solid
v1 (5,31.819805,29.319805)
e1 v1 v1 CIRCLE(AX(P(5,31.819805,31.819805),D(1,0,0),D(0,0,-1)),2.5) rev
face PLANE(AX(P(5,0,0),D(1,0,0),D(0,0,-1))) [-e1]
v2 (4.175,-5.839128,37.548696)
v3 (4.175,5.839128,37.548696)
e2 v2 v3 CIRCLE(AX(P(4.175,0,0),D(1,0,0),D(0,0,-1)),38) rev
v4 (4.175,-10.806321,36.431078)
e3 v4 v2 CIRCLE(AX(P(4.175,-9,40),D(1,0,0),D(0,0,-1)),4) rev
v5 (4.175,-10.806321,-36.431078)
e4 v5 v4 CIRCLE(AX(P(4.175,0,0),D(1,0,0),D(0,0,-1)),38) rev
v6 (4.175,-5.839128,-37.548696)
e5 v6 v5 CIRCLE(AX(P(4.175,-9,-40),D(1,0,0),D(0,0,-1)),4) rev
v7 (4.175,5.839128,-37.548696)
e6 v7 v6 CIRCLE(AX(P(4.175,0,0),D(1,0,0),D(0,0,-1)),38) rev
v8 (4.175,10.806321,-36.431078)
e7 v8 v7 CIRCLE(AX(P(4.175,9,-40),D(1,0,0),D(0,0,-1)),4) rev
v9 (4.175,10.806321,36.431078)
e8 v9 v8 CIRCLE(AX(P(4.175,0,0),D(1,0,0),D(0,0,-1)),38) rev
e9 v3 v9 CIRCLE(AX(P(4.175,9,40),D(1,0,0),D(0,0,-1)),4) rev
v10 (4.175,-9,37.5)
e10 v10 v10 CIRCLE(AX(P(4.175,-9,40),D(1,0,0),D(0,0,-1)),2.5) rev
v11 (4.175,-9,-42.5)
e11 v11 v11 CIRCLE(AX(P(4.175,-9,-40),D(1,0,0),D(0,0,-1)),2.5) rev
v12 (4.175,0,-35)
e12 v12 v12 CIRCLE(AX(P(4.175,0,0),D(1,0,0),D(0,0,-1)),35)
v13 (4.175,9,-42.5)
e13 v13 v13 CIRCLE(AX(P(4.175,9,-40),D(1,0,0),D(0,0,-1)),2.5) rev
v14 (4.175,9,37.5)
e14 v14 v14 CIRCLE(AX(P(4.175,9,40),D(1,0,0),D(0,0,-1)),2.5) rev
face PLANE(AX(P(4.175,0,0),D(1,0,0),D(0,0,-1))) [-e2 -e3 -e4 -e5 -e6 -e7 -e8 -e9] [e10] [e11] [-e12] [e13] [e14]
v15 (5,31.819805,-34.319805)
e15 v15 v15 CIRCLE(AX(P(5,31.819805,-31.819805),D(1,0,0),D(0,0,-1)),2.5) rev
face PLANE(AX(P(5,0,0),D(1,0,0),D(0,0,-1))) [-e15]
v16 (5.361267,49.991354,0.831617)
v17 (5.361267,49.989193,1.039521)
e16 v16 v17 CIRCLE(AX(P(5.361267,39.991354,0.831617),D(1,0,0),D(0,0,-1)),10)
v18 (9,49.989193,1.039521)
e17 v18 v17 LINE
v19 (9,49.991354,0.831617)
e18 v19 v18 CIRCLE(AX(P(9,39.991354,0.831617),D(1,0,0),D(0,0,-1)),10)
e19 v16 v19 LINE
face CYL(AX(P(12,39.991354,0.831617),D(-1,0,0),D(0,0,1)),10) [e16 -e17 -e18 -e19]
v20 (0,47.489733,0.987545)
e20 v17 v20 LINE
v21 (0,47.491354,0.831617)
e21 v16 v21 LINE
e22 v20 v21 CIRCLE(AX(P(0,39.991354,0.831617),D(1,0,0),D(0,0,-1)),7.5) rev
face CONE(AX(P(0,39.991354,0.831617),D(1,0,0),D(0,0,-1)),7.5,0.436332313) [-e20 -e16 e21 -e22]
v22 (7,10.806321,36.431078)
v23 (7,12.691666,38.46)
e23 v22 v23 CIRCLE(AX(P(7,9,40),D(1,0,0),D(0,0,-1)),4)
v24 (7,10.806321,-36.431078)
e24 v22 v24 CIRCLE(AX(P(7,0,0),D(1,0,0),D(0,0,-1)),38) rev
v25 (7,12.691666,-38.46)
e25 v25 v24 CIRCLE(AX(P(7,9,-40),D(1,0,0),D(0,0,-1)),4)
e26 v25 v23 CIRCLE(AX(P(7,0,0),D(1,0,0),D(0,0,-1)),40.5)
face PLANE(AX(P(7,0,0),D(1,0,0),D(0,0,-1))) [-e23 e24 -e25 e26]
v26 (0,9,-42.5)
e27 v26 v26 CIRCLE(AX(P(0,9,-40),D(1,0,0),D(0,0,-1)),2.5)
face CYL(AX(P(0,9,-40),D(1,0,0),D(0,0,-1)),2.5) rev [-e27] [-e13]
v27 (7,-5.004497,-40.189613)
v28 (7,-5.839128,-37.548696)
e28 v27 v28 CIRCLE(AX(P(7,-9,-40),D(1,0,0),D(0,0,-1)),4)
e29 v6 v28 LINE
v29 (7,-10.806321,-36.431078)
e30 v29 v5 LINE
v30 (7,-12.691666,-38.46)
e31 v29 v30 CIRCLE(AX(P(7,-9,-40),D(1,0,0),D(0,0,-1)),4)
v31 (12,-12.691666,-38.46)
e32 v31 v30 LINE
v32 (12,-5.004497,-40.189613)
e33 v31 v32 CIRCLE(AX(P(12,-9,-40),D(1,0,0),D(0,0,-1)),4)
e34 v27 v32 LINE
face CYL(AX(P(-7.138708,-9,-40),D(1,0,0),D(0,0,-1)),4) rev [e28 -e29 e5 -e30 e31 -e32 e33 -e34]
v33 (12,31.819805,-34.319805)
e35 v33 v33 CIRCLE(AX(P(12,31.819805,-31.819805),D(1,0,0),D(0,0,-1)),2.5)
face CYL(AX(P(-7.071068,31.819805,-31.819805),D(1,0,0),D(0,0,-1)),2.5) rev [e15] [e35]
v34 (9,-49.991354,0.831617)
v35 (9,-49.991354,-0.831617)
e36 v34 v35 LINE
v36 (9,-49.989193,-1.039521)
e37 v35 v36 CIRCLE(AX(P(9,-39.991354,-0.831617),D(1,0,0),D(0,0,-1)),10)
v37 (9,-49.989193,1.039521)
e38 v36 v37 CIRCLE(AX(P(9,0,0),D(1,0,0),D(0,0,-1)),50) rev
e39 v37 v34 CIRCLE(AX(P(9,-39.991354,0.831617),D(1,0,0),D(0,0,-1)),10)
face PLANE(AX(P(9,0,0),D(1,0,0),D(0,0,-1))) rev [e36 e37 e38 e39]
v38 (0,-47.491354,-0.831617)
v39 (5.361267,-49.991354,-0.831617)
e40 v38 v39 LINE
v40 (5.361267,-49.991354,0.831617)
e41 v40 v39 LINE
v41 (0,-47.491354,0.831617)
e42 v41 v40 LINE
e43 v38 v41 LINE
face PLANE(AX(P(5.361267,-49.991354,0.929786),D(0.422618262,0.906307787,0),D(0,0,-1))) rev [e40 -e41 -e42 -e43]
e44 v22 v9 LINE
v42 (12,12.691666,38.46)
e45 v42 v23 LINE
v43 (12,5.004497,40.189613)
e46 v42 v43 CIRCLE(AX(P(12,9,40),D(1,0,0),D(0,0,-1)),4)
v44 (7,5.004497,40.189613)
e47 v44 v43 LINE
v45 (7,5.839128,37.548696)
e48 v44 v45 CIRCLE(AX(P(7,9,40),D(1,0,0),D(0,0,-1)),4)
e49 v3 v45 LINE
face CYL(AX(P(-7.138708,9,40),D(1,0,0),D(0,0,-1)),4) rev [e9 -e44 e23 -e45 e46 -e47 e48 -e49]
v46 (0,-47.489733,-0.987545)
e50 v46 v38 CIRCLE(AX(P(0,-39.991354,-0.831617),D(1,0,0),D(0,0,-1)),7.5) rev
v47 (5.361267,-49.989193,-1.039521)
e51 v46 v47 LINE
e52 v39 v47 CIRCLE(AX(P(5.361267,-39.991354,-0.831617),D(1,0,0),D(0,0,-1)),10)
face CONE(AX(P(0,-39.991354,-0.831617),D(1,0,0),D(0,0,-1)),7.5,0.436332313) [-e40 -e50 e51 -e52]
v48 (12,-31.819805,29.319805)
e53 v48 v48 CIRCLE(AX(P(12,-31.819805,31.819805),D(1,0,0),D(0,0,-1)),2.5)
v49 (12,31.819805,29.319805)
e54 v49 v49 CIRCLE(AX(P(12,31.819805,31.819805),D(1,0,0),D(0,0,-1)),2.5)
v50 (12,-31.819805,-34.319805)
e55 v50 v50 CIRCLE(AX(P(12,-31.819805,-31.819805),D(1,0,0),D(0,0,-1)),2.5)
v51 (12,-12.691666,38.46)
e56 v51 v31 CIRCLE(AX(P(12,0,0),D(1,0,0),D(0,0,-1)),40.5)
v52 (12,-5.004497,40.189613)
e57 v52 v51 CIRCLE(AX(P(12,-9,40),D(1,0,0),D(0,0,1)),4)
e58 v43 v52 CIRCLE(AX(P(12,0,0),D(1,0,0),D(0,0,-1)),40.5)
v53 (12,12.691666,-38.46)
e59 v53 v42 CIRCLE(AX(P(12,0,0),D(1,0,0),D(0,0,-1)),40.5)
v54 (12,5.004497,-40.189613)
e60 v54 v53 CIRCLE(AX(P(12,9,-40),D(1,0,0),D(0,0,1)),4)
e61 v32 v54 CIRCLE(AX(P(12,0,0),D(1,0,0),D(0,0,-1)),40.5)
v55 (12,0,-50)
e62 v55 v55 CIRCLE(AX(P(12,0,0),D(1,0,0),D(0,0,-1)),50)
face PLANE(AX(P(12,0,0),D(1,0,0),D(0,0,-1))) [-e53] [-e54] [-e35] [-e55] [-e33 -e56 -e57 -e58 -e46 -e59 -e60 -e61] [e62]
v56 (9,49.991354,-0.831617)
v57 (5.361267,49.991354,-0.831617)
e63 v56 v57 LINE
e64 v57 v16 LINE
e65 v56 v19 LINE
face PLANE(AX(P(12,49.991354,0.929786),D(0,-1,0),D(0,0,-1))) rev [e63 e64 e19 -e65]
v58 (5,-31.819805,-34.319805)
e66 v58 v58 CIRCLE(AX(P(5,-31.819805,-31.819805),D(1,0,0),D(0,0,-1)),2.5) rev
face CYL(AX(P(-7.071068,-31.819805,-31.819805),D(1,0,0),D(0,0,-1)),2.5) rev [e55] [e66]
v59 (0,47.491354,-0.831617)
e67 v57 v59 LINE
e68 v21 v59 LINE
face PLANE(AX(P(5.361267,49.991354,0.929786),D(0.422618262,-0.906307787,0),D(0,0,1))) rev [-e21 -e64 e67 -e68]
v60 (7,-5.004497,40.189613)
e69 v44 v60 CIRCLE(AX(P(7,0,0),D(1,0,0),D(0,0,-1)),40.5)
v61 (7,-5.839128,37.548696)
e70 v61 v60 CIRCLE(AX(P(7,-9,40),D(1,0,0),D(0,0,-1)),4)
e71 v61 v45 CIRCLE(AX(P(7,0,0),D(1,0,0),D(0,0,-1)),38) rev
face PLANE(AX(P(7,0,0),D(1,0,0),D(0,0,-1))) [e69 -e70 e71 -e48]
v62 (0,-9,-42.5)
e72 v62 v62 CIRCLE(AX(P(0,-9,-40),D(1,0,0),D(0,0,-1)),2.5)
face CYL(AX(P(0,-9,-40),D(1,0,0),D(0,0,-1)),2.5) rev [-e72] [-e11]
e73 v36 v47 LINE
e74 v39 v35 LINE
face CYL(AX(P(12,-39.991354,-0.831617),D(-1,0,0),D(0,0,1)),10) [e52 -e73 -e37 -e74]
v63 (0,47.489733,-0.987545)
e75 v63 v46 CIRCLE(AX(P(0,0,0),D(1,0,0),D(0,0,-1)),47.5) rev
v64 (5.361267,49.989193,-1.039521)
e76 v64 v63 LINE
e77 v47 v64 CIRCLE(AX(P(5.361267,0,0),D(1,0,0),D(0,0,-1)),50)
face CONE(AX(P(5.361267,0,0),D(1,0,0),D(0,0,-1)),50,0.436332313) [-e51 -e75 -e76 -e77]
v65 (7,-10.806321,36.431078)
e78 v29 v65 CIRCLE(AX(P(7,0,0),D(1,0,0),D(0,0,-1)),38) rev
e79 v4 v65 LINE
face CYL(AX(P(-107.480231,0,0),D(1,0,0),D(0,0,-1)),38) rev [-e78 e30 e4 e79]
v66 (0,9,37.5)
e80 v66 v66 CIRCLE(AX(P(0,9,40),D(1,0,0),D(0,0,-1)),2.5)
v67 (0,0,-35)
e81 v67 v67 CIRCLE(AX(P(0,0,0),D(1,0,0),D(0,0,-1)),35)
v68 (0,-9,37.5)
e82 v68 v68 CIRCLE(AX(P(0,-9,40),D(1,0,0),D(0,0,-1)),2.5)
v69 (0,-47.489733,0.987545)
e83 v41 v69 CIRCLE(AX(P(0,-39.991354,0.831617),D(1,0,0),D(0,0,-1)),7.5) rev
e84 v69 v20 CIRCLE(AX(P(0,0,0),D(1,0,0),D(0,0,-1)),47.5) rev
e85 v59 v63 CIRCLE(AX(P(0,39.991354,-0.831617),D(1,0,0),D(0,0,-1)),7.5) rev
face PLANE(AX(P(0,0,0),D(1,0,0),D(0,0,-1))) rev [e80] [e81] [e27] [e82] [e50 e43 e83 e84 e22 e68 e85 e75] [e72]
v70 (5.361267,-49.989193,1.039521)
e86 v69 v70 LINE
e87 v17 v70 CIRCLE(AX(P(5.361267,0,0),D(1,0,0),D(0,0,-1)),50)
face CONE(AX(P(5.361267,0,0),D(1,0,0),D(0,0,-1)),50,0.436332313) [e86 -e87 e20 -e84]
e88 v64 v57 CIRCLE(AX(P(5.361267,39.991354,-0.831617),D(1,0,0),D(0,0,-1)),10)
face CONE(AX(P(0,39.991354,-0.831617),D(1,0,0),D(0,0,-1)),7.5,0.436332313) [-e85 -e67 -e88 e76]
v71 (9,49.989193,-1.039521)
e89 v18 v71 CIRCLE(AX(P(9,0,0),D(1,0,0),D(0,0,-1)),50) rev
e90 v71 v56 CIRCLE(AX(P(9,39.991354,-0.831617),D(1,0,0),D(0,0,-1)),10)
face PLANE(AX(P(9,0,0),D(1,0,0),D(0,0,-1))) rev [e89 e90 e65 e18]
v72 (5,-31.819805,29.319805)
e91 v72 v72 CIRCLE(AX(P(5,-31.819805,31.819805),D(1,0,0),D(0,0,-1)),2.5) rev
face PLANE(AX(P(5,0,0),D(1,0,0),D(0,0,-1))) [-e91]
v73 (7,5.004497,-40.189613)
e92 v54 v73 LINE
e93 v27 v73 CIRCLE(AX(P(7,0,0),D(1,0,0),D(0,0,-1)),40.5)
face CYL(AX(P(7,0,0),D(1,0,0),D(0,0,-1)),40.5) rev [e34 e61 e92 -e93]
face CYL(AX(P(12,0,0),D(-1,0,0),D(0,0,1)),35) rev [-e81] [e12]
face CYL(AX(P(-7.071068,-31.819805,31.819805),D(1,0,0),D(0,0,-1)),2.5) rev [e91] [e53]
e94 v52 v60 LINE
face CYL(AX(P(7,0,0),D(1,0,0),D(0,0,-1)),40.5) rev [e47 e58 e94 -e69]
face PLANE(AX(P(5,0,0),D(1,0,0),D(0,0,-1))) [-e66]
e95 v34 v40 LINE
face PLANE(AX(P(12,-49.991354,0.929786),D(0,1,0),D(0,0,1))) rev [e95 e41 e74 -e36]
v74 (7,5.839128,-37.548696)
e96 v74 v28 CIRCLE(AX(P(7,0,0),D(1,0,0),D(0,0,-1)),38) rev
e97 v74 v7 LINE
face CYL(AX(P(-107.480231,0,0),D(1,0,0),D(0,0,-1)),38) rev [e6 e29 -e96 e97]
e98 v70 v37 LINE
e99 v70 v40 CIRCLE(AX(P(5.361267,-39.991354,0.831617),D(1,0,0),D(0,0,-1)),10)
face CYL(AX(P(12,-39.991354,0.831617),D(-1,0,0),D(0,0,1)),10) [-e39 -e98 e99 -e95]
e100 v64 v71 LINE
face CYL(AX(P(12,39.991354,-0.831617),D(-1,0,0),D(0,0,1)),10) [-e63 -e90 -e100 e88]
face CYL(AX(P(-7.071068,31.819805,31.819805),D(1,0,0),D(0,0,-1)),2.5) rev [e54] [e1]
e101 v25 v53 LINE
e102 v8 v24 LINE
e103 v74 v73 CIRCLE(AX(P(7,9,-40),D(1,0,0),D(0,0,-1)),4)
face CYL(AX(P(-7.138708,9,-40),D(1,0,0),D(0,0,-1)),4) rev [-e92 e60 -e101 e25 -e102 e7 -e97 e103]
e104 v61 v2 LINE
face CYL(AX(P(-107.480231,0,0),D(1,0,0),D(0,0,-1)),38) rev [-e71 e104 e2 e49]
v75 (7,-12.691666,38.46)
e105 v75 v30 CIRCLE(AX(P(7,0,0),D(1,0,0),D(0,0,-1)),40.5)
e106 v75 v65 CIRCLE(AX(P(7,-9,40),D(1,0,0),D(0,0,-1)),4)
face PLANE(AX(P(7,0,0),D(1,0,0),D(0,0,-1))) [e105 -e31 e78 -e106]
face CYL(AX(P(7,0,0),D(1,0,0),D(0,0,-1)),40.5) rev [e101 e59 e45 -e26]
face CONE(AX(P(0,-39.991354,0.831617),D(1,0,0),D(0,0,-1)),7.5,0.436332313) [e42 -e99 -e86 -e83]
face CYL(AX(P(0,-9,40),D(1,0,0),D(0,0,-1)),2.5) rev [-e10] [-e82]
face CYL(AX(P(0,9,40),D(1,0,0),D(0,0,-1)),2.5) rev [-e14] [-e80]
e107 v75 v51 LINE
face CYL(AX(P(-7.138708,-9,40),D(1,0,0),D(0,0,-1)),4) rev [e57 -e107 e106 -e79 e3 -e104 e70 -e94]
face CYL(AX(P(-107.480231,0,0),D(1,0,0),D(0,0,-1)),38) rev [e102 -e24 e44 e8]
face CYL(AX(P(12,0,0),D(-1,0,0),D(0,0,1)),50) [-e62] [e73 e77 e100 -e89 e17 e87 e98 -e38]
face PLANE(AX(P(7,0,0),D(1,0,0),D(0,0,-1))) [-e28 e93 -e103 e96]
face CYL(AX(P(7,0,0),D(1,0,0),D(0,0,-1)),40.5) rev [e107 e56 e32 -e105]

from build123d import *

# Parameters (mm, degrees)
SKETCH1_R           = 35.00000000000001
BOSS_EXTRUDE1_DEPTH = 12
SKETCH2_R           = 38
CUT_EXTRUDE1_DEPTH  = 7.825
SKETCH3_R           = 40.5
CUT_EXTRUDE2_DEPTH  = 5
BOSS_EXTRUDE3_START = -3
SKETCH4_R           = 50.000000000000014
SKETCH4_R_2         = 40.5
BOSS_EXTRUDE3_DEPTH = 3
FILLET1_R           = 10
SKETCH5_R           = 2.5000000000000018
CUT_EXTRUDE3_DEPTH  = 72.72168430816446
CUT_EXTRUDE4_REACH  = 73.722
SKETCH9_R           = 3.999999999999999
CHAMFER2_SIZE       = 2.5
CHAMFER2_SIZE2      = 5.361267301273932
SKETCH10_R          = 2.499999999999999
SKETCH10_R_2        = 2.5000000000000004
SKETCH10_R_3        = 2.5000000000000018
SKETCH10_R_4        = 2.499999999999998
CUT_EXTRUDE5_DEPTH  = 7


with BuildPart() as part:
    # Sketch1 → Boss-Extrude1 (new body)
    with BuildSketch(Plane(origin=(0, 0, 0), x_dir=(0, 0, -1), z_dir=(1, 0, 0))):
        with BuildLine():
            Line((-0.9297857327654514, 49.99135423741935), (0.9297857327657116, 49.99135423741935))
            ThreePointArc((0.9297857327657116, 49.99135423741935), (50, 4.17e-15), (0.9297857327657116, -49.99135423741935))
            Line((0.9297857327657116, -49.99135423741935), (-0.9297857327654514, -49.99135423741935))
            ThreePointArc((-0.9297857327654514, -49.99135423741935), (-50.00000000000001, 1.029e-14), (-0.9297857327654514, 49.99135423741935))
        make_face()
        Circle(SKETCH1_R, mode=Mode.SUBTRACT)
    extrude(amount=BOSS_EXTRUDE1_DEPTH)

    # Sketch2 → Cut-Extrude1 (cut)
    with BuildSketch(Plane(origin=(12, 0, 0), x_dir=(0, 0, -1), z_dir=(1, 0, 0))):
        Circle(SKETCH2_R)
    extrude(amount=-CUT_EXTRUDE1_DEPTH, mode=Mode.SUBTRACT)

    # Sketch3 → Cut-Extrude2 (cut)
    with BuildSketch(Plane(origin=(12, 0, 0), x_dir=(0, 0, -1), z_dir=(1, 0, 0))):
        Circle(SKETCH3_R)
    extrude(amount=-CUT_EXTRUDE2_DEPTH, mode=Mode.SUBTRACT)

    # Sketch4 → Boss-Extrude3 (add)
    with BuildSketch(Plane(origin=(12, 0, 0), x_dir=(0, 0, -1), z_dir=(1, 0, 0)).offset(BOSS_EXTRUDE3_START)):
        with Locations(Location((0, 0, 0), (0, 0, 91.065517382))):
            Circle(SKETCH4_R)
        Circle(SKETCH4_R_2, mode=Mode.SUBTRACT)
    extrude(amount=BOSS_EXTRUDE3_DEPTH)

    # Fillet1
    # the kernel refuses this fillet: 10 mm, written as the material it takes off along each edge
    with BuildSketch(Plane(origin=(-0.2743909200605188, 49.99135423741935, 0.9297857327658466), x_dir=(0, 0, -1), z_dir=(1, 0, 0))) as fillet1_piece_1:
        with BuildLine():
            CenterArc((0.09816907994918522, -10), FILLET1_R, 90, 1.1912889407278016)
            ThreePointArc((-0.10973508325497316, -0.00216144064516044), (-0.05486813470735008, -0.0010506100030554), (0, 0))
            Line((0, 0), (0.09816907994918522, 0))
        make_face()
    extrude(amount=9.27439092006841, mode=Mode.SUBTRACT)
    with BuildSketch(Plane(origin=(-0.27439092006290455, 49.99135423741935, -0.9297857327660938), x_dir=(0, 0, 1), z_dir=(1, 0, 0))) as fillet1_piece_2:
        with BuildLine():
            CenterArc((0.09816907994990931, 10), FILLET1_R, 268.80871105927287, 1.1912889407271336)
            ThreePointArc((-0.10973508325413761, 0.00216144064516044), (-0.05486813470693486, 0.0010506100030554), (0, 0))
            Line((0, 0), (0.09816907994990931, 0))
        make_face()
    extrude(amount=9.274390920070795, mode=Mode.SUBTRACT)
    with BuildSketch(Plane(origin=(-0.27439092006166854, -49.991354237419344, -0.9297857327653347), x_dir=(0, 0.019693077349376736, -0.9998060725483275), z_dir=(1, 0, 0))) as fillet1_piece_3:
        with BuildLine():
            CenterArc((0.09878073122404785, 9.999993976768026), FILLET1_R, 268.8715968385298, 1.19128894072702)
            Line((-0.09815004226971198, 0.00193325128475002), (0, 0))
            ThreePointArc((0, 0), (0.05487818401377818, -3.011615987851e-05), (0.10975636802755673, 0))
        make_face()
    extrude(amount=9.274390920069559, mode=Mode.SUBTRACT)
    with BuildSketch(Plane(origin=(-0.27439092005998433, -49.991354237419344, 0.9297857327658335), x_dir=(0, 0.019693077349452987, 0.999806072548326), z_dir=(1, 0, 0))) as fillet1_piece_4:
        with BuildLine():
            CenterArc((0.09878073122379578, -9.999993976768023), FILLET1_R, 89.93711422074833, 1.191288940726281)
            Line((-0.09815004227073397, -0.00193325128476343), (0, 0))
            ThreePointArc((0, 0), (0.05487818401320508, 3.011615987141e-05), (0.10975636802641013, 0))
        make_face()
    extrude(amount=9.274390920067875, mode=Mode.SUBTRACT)

    # Sketch5 → Cut-Extrude3 (cut, through all)
    with BuildSketch(Plane(origin=(12, 0, 0), x_dir=(0, 0, -1), z_dir=(1, 0, 0))):
        with Locations((39.999999999999986, 9.000000000000002)):
            Circle(SKETCH5_R)
        with Locations((39.999999999999986, -8.999999999999998)):
            Circle(SKETCH5_R)
        with Locations((-40.000000000000014, -8.999999999999998)):
            Circle(SKETCH5_R)
        with Locations((-40.000000000000014, 8.999999999999998)):
            Circle(SKETCH5_R)
    extrude(amount=-CUT_EXTRUDE3_DEPTH, mode=Mode.SUBTRACT)

    # Cut-Extrude4: up to this face of the body (flat: up to its plane)
    cut_extrude4_end = Plane(part.part.faces().sort_by_distance((4.175, 0, 36.925197693))[0])
    # Sketch9 → Cut-Extrude4 (cut, up to the picked face)
    with BuildSketch(Plane(origin=(12, 0, 0), x_dir=(0, 0, -1), z_dir=(1, 0, 0)), mode=Mode.PRIVATE) as cut_extrude4_sk1:
        with Locations((-40.000000000000014, 8.999999999999998)):
            Circle(SKETCH9_R)
    cut_extrude4_tool1 = split(extrude(cut_extrude4_sk1.sketch, amount=-CUT_EXTRUDE4_REACH, mode=Mode.PRIVATE), bisect_by=cut_extrude4_end, keep=Keep.BOTH, mode=Mode.PRIVATE)
    # Sketch9 → Cut-Extrude4 (cut, up to the picked face)
    with BuildSketch(Plane(origin=(12, 0, 0), x_dir=(0, 0, -1), z_dir=(1, 0, 0)), mode=Mode.PRIVATE) as cut_extrude4_sk2:
        with Locations((-40.000000000000014, -8.999999999999998)):
            Circle(SKETCH9_R)
    cut_extrude4_tool2 = split(extrude(cut_extrude4_sk2.sketch, amount=-CUT_EXTRUDE4_REACH, mode=Mode.PRIVATE), bisect_by=cut_extrude4_end, keep=Keep.BOTH, mode=Mode.PRIVATE)
    # Sketch9 → Cut-Extrude4 (cut, up to the picked face)
    with BuildSketch(Plane(origin=(12, 0, 0), x_dir=(0, 0, -1), z_dir=(1, 0, 0)), mode=Mode.PRIVATE) as cut_extrude4_sk3:
        with Locations((39.999999999999986, -8.999999999999998)):
            Circle(SKETCH9_R)
    cut_extrude4_tool3 = split(extrude(cut_extrude4_sk3.sketch, amount=-CUT_EXTRUDE4_REACH, mode=Mode.PRIVATE), bisect_by=cut_extrude4_end, keep=Keep.BOTH, mode=Mode.PRIVATE)
    # Sketch9 → Cut-Extrude4 (cut, up to the picked face)
    with BuildSketch(Plane(origin=(12, 0, 0), x_dir=(0, 0, -1), z_dir=(1, 0, 0)), mode=Mode.PRIVATE) as cut_extrude4_sk4:
        with Locations((39.999999999999986, 8.999999999999998)):
            Circle(SKETCH9_R)
    cut_extrude4_tool4 = split(extrude(cut_extrude4_sk4.sketch, amount=-CUT_EXTRUDE4_REACH, mode=Mode.PRIVATE), bisect_by=cut_extrude4_end, keep=Keep.BOTH, mode=Mode.PRIVATE)
    add(cut_extrude4_tool1.solids().sort_by(Axis((12, 9, 40), (-1, 0, 0)))[0], mode=Mode.SUBTRACT)
    add(cut_extrude4_tool2.solids().sort_by(Axis((12, -9, 40), (-1, 0, 0)))[0], mode=Mode.SUBTRACT)
    add(cut_extrude4_tool3.solids().sort_by(Axis((12, -9, -40), (-1, 0, 0)))[0], mode=Mode.SUBTRACT)
    add(cut_extrude4_tool4.solids().sort_by(Axis((12, 9, -40), (-1, 0, 0)))[0], mode=Mode.SUBTRACT)

    # Chamfer2
    chamfer2_edges = [part.edges().sort_by_distance(p)[0] for p in [
        (0, 4.163e-14, 50.000000000000014),
        (0, 8.2534e-13, -50),
        (0, 49.99135423741935, 4.9938e-13),
        (0, -49.99135423741935, 7.583e-14),
        (0, -49.99081386265752, 0.9355743520296814),
        (0, -49.990813862657504, -0.9355743520294721),
        (0, 49.99081386265747, -0.9355743520297026),
        (0, 49.99081386265747, 0.9355743520307873),
    ]]
    chamfer2_side = [part.faces().sort_by_distance(p)[0] for p in [
        (0, -48.576798978470165, -0.920873784247004),
    ]]
    chamfer(chamfer2_edges, length=CHAMFER2_SIZE, length2=CHAMFER2_SIZE2, reference=chamfer2_side[0])

    # Sketch10 → Cut-Extrude5 (cut)
    with BuildSketch(Plane(origin=(12, 0, 0), x_dir=(0, 0, -1), z_dir=(1, 0, 0))):
        with Locations((-31.819805153394583, 31.819805153394686)):
            Circle(SKETCH10_R)
        with Locations((31.819805153394796, 31.81980515339447)):
            Circle(SKETCH10_R_2)
        with Locations((31.81980515339436, -31.819805153394906)):
            Circle(SKETCH10_R_3)
        with Locations((-31.81980515339502, -31.81980515339425)):
            Circle(SKETCH10_R_4)
    extrude(amount=-CUT_EXTRUDE5_DEPTH, mode=Mode.SUBTRACT)


solid = part.part
